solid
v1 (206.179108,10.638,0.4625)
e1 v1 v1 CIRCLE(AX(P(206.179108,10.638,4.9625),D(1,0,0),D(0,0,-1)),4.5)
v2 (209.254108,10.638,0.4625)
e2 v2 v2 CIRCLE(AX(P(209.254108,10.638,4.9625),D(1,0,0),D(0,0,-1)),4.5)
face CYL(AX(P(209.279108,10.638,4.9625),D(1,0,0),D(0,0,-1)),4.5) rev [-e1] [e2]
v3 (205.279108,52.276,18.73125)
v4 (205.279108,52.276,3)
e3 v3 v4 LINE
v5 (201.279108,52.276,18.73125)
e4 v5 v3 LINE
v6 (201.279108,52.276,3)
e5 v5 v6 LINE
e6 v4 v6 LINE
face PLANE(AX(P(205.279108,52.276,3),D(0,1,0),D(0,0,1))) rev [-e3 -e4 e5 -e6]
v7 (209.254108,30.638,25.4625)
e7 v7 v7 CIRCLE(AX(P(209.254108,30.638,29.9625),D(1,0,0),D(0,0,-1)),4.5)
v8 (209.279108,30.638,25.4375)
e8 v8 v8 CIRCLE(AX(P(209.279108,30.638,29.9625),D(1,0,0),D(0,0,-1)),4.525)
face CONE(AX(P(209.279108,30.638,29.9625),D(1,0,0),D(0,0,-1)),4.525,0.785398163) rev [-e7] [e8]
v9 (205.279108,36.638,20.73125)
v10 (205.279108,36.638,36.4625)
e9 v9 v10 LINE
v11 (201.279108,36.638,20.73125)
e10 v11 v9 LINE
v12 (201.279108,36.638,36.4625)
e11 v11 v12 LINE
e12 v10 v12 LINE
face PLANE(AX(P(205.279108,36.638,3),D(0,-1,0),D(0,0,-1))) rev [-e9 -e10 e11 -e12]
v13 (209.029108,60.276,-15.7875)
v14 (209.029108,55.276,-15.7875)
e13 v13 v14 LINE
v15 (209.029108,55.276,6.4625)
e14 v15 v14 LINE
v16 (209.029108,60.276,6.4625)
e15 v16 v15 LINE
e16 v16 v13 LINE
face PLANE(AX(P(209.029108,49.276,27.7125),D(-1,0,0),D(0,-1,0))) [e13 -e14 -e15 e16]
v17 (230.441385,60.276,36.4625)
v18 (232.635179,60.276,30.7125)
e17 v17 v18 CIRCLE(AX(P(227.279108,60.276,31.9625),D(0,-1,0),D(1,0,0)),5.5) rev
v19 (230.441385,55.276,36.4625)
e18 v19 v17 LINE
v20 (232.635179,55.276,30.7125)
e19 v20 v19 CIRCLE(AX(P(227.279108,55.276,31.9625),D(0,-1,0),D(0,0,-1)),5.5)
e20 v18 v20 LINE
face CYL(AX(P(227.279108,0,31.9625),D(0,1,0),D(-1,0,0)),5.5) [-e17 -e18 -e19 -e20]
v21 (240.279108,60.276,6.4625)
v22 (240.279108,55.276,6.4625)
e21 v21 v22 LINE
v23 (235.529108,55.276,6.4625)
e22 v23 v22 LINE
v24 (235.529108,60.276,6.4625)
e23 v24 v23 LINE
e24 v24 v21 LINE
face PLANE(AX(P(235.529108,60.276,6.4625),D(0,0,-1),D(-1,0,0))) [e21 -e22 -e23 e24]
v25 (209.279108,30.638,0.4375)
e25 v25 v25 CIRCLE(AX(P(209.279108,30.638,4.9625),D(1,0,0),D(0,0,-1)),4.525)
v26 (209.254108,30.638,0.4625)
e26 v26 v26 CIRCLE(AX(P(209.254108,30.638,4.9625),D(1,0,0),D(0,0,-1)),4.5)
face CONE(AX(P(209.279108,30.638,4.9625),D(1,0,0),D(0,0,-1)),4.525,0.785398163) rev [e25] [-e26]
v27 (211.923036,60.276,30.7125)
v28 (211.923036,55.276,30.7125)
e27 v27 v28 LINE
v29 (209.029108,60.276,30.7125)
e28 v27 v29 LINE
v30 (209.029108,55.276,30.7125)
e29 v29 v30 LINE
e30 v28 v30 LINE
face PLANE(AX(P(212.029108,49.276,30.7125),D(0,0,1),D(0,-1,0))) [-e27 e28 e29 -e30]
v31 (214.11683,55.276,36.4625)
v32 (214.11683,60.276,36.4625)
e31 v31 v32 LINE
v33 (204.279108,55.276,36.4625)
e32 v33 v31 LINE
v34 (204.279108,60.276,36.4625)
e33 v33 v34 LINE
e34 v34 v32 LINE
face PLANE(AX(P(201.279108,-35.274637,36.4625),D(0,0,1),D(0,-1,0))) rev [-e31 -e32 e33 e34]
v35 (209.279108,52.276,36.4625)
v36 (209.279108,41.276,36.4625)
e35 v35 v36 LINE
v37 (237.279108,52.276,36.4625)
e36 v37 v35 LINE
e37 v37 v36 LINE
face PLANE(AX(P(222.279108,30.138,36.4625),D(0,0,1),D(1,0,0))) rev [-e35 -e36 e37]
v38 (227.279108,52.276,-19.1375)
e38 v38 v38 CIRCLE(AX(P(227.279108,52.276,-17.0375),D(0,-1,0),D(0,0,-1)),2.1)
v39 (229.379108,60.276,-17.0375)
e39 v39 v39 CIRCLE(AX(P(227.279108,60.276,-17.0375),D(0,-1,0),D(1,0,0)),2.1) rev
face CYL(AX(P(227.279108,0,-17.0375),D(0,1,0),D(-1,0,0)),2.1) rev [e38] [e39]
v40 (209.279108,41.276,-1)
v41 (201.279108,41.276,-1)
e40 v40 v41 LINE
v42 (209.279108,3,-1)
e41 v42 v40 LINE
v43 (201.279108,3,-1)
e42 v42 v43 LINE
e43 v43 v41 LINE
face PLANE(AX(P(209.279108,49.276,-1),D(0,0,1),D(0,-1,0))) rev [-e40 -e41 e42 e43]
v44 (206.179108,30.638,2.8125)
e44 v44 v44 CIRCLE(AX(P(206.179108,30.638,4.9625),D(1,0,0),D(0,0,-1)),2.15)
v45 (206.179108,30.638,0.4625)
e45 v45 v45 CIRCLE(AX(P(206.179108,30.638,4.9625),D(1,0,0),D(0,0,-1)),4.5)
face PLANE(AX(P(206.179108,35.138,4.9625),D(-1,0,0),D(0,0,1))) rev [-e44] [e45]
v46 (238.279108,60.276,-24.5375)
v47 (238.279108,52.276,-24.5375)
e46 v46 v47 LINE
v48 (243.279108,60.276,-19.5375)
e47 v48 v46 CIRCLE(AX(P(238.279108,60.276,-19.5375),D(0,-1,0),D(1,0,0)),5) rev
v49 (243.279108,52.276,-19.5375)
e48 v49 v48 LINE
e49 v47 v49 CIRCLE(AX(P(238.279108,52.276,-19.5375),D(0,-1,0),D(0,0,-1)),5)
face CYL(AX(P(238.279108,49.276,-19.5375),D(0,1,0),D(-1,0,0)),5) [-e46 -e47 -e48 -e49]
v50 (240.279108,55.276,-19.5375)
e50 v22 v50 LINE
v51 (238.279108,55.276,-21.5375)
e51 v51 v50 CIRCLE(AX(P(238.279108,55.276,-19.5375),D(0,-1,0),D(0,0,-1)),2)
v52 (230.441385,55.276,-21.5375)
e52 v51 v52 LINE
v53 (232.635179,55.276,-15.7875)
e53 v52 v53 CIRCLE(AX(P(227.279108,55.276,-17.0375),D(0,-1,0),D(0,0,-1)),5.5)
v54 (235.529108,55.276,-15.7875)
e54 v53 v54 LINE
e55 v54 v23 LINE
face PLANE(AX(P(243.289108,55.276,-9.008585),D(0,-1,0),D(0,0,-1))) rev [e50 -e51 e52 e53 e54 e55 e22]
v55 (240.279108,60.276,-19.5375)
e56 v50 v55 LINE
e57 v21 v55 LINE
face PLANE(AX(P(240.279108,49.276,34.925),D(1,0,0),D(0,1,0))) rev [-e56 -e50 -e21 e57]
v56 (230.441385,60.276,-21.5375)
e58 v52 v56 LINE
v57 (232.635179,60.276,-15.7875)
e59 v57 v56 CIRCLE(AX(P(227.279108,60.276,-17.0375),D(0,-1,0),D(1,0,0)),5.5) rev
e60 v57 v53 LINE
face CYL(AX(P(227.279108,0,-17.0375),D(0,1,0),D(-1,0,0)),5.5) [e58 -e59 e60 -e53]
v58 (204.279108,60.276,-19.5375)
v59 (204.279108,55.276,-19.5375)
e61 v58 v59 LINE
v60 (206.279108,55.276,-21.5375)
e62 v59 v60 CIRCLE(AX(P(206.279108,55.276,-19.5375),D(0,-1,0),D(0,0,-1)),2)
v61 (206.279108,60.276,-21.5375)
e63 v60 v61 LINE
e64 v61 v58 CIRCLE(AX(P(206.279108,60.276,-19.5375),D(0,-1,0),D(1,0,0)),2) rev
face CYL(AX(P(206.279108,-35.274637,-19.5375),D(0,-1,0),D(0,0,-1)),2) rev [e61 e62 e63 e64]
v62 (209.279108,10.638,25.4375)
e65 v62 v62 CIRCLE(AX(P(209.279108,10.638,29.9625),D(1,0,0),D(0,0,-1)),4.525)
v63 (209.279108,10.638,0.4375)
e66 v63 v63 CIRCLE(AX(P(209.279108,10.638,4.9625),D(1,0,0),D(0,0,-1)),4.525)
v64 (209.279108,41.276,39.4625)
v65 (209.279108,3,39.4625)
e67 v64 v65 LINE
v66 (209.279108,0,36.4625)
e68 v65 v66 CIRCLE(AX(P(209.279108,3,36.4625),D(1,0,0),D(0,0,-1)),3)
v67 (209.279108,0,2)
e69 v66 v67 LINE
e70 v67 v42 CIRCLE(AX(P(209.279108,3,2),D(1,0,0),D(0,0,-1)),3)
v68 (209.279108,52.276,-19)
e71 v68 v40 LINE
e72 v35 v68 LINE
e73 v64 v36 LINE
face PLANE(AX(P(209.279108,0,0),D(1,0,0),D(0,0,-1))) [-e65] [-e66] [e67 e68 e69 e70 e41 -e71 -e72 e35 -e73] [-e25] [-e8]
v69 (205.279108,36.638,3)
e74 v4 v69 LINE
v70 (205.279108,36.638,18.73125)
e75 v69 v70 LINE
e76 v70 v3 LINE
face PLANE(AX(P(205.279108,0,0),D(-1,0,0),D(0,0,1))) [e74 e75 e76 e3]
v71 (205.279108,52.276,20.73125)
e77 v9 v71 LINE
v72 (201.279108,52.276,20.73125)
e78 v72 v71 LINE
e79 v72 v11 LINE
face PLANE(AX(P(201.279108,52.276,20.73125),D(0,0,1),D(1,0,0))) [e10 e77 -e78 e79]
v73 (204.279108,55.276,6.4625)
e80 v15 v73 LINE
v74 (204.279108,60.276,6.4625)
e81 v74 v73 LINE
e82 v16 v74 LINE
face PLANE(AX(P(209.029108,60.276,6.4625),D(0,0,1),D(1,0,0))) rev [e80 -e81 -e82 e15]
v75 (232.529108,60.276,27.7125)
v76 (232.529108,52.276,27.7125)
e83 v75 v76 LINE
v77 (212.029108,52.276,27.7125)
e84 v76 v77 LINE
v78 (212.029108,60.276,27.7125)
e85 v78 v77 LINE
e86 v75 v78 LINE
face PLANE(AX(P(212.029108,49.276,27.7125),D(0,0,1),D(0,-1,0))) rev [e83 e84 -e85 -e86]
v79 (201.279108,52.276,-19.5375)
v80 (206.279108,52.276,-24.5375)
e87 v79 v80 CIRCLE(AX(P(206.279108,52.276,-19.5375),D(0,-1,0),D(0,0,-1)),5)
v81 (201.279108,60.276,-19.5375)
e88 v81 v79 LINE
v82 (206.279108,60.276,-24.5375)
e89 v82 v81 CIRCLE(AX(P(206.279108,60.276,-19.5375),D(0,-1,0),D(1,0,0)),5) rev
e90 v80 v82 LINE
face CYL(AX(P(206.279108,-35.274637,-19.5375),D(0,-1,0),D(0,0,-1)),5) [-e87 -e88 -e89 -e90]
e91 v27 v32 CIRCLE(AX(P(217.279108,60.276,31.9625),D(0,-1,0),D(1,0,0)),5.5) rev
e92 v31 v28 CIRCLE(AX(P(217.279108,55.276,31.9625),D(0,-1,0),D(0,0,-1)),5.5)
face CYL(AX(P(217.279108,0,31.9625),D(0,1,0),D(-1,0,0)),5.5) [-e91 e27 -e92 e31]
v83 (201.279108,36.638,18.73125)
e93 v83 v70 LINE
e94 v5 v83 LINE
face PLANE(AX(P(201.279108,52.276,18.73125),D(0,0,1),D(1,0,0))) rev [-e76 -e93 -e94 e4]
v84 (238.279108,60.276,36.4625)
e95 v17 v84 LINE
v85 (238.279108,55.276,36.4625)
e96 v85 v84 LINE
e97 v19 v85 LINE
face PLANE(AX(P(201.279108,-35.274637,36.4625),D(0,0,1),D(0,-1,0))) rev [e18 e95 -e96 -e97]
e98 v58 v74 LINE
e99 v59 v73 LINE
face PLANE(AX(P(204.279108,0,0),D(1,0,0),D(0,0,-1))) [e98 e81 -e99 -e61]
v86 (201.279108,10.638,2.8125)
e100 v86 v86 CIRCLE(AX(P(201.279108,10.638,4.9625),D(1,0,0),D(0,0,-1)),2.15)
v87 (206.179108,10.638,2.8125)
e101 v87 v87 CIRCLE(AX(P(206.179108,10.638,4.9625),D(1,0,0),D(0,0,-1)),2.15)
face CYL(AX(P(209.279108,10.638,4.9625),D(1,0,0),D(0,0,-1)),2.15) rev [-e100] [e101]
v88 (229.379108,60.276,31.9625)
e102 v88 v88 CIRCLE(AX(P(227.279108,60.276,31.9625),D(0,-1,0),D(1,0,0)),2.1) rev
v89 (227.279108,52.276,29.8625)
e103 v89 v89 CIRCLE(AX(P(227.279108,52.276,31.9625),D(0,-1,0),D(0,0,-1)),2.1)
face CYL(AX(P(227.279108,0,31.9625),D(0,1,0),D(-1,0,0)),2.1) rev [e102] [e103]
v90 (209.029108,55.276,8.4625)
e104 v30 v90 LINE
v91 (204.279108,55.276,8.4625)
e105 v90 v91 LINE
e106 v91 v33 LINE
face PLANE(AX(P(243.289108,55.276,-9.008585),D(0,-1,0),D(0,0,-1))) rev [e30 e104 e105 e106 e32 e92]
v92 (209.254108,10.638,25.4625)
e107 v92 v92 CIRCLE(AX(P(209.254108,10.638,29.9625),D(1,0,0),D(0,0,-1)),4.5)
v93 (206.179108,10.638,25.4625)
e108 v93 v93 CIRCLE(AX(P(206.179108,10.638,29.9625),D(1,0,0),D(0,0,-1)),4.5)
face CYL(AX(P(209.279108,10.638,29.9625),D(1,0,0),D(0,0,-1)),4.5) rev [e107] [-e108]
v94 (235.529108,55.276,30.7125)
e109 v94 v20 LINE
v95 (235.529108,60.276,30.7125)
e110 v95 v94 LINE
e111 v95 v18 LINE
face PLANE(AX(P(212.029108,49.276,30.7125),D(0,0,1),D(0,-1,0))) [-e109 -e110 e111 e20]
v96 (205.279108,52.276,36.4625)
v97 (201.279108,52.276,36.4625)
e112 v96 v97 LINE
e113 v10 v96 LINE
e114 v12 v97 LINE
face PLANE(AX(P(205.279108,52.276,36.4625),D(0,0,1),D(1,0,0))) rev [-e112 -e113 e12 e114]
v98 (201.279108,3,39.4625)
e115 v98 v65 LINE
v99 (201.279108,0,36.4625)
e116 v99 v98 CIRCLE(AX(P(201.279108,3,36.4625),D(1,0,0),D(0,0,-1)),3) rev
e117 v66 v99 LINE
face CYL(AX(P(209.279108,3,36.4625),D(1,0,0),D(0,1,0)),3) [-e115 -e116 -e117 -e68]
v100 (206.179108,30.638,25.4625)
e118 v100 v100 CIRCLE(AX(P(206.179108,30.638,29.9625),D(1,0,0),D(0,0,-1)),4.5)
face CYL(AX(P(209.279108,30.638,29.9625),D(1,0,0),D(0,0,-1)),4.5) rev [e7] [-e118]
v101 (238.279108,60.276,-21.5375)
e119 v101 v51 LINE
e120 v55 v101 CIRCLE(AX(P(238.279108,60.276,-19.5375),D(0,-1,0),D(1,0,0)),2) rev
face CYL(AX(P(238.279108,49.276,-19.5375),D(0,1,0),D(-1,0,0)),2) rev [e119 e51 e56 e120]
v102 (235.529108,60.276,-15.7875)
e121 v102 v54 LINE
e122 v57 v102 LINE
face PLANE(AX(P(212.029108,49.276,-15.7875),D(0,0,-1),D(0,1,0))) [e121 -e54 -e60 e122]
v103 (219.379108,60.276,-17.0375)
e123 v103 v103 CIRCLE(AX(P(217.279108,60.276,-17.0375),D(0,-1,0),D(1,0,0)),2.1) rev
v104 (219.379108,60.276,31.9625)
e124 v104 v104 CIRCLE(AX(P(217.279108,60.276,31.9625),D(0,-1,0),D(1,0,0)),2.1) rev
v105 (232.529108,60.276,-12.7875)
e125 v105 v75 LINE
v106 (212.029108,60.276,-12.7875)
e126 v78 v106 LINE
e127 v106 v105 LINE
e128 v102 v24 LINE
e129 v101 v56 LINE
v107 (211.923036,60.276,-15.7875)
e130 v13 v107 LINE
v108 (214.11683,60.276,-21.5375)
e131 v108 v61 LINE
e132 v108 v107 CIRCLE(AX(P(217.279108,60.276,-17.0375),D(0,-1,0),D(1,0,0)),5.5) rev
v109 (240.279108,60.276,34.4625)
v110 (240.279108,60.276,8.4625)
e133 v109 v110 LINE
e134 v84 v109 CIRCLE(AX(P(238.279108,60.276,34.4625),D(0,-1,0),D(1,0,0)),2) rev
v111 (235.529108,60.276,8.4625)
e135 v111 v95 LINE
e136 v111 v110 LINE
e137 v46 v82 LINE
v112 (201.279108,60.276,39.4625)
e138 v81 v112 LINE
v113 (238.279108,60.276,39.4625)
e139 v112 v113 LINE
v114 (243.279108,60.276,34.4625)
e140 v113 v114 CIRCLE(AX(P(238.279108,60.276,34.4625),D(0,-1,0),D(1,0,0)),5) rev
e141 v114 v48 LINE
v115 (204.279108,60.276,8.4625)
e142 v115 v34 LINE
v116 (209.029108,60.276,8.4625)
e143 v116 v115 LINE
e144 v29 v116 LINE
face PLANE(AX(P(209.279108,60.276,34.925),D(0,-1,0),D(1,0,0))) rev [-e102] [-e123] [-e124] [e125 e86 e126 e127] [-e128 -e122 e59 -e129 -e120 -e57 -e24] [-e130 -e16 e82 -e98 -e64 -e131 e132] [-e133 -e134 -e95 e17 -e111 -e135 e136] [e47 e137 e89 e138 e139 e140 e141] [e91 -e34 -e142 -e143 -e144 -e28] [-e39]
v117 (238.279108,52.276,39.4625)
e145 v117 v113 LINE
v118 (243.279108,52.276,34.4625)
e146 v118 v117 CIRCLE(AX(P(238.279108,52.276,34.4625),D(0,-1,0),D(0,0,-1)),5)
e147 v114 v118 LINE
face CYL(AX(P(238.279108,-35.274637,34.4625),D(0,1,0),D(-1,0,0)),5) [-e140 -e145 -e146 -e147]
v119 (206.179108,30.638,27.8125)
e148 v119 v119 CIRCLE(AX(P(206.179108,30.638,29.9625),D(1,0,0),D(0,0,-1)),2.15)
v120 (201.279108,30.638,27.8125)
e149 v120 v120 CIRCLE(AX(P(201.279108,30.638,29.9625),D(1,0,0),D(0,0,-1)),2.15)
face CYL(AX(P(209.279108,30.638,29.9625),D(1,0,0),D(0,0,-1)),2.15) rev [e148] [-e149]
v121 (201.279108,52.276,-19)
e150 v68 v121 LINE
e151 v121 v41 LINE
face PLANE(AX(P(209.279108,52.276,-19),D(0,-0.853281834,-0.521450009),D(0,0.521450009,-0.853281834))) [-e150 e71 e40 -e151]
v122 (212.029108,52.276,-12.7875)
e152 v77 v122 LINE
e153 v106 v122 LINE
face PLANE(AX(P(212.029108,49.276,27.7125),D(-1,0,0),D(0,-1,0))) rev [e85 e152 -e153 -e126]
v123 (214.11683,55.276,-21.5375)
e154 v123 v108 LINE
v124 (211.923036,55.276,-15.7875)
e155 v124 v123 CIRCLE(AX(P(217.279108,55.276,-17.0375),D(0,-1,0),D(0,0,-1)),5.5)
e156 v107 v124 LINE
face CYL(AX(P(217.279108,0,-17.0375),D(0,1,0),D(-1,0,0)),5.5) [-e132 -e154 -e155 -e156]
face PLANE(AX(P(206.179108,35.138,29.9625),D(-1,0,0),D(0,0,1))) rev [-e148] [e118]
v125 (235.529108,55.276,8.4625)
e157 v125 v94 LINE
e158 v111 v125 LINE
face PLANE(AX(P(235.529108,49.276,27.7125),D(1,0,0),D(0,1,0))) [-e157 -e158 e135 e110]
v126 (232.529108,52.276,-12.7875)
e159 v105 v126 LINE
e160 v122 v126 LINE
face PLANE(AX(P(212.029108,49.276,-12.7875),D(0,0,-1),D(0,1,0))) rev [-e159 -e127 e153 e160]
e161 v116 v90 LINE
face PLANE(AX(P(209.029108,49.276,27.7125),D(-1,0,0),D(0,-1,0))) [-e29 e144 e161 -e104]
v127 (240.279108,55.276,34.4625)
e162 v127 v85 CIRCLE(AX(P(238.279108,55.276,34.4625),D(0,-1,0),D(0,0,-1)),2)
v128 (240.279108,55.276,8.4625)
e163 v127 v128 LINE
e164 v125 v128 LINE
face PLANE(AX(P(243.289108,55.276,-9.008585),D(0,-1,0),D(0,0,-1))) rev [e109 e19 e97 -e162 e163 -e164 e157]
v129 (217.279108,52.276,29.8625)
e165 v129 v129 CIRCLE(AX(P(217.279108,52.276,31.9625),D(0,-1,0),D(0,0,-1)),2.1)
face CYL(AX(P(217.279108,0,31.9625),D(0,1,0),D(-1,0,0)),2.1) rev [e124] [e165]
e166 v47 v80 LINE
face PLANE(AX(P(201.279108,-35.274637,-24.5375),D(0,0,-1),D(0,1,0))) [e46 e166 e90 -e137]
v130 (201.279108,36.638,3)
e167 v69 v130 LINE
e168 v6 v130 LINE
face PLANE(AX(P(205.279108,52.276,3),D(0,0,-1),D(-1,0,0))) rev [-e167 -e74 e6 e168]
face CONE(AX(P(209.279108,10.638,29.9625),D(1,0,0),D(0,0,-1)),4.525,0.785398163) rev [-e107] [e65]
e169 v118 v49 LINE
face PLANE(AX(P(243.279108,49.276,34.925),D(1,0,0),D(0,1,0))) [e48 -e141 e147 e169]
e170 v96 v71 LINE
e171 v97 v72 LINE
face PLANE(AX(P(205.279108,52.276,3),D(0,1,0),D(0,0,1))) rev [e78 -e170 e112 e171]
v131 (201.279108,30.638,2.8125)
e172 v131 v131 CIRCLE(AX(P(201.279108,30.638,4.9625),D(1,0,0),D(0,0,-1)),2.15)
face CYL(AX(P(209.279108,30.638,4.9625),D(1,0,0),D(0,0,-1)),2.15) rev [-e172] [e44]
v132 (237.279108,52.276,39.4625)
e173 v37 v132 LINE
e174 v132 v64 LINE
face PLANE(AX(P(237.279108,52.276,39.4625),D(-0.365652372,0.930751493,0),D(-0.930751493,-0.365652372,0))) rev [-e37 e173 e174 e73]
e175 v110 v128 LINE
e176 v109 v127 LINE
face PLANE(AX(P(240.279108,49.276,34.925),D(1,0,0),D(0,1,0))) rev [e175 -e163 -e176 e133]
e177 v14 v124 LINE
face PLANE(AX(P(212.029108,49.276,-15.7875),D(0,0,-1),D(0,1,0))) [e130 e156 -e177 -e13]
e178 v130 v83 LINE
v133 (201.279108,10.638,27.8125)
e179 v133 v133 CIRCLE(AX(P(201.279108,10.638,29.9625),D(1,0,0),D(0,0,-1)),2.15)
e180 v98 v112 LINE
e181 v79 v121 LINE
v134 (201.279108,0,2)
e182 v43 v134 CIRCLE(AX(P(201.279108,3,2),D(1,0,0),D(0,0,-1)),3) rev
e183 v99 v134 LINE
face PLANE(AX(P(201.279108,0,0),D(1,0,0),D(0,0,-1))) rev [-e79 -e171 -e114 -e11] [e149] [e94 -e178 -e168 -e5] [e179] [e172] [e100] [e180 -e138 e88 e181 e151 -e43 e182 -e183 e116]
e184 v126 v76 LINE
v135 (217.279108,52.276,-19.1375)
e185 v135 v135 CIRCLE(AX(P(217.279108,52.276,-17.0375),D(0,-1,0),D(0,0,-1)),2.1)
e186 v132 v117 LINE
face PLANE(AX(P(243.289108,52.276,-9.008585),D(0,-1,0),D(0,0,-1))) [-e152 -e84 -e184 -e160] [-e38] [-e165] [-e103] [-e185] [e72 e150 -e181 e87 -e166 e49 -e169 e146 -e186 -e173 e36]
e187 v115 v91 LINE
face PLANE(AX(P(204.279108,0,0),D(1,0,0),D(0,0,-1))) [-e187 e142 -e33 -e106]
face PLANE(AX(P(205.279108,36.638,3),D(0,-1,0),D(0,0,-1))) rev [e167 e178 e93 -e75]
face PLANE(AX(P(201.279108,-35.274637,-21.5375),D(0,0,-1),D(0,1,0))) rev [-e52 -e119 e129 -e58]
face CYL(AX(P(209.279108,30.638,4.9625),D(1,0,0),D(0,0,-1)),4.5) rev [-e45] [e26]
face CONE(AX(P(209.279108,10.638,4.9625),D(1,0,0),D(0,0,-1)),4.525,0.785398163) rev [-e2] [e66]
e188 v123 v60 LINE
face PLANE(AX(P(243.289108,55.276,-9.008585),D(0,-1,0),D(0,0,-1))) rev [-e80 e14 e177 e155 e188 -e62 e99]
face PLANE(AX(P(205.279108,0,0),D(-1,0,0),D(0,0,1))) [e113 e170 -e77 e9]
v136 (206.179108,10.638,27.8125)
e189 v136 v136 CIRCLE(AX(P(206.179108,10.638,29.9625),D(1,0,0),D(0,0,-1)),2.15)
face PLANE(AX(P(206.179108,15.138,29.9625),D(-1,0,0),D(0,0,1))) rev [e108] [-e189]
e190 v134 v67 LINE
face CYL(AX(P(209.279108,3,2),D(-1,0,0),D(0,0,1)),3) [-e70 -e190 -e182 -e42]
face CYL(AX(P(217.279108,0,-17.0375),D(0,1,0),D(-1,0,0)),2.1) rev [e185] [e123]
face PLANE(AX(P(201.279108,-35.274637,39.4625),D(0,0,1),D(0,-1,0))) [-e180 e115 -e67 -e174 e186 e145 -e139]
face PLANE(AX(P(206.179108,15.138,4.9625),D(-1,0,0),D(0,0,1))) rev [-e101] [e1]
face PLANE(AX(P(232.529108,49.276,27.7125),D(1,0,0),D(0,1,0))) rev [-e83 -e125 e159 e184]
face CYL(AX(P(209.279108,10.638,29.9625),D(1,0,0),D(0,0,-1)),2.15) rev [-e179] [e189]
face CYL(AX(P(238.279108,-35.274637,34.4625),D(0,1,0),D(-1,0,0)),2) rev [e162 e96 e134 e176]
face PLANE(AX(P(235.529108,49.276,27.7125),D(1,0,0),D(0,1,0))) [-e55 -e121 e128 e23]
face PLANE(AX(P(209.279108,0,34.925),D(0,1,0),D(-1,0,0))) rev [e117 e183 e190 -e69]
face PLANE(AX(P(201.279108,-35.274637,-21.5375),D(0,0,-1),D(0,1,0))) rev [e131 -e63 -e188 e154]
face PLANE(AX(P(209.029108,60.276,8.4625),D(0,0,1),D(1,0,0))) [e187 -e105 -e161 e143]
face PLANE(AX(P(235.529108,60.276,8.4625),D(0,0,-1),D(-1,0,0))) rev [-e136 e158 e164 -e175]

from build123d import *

# Parameters (mm, degrees)
SKETCH1_W                                     = 34.925
SKETCH1_H                                     = 49.276
BOSS_EXTRUDE1_DEPTH                           = 8
SKETCH2_W                                     = 42
SKETCH2_H                                     = 8
BOSS_EXTRUDE2_DEPTH                           = 34.925
CBORE_FOR_M4_PAN_HEAD_MACHINE_SCREW1_AT_COUNT = 2
CBORE_FOR_M4_PAN_HEAD_MACHINE_SCREW1_AT_PITCH = 25.000000038
CBORE_FOR_M4_PAN_HEAD_MACHINE_SCREW1_2_COUNT  = 2
CBORE_FOR_M4_PAN_HEAD_MACHINE_SCREW1_2_PITCH  = 32.015620982
CBORE_FOR_M4_PAN_HEAD_MACHINE_SCREW1_3_COUNT  = 2
CBORE_FOR_M4_PAN_HEAD_MACHINE_SCREW1_3_PITCH  = 19.999999624
SKETCH5_R                                     = 9
CUT_EXTRUDE1_DEPTH                            = 21
CUT_EXTRUDE2_START                            = -1
SKETCH5_4_R                                   = 11
CUT_EXTRUDE2_DEPTH                            = 7
FILLET1_R                                     = 17
SKETCH7_W                                     = 42
SKETCH7_H                                     = 64
BOSS_EXTRUDE3_DEPTH                           = 8
SKETCH8_R                                     = 2.5
CUT_EXTRUDE3_DEPTH                            = 252.336701124
MOVE_FACE1_OUTLINE_W                          = 8
MOVE_FACE1_OUTLINE_H                          = 4.5375
MOVE_FACE1_DEPTH                              = 41.276
SKETCH9_W                                     = 20.5
SKETCH9_H                                     = 40.5
CUT_EXTRUDE4_DEPTH                            = 250.891419084
MOVE_FACE2_BY                                 = 11
MOVE_START                                    = -24.5375
MOVE_FACE3_OUTLINE_W                          = 34
MOVE_FACE3_OUTLINE_H                          = 11
MOVE_FACE3_DEPTH                              = 64
MOVE_FACE3_2_OUTLINE_W                        = 8
MOVE_FACE3_2_OUTLINE_H                        = 11
MOVE_FACE3_2_DEPTH                            = 24.5375
FILLET2_R                                     = 5
SPLIT1_SURFACE_1_BACK                         = 98.433
SPLIT1_SURFACE_1_DEPTH                        = 196.866
SPLIT1_SURFACE_2_BACK                         = 98.433
SPLIT1_SURFACE_2_DEPTH                        = 196.866
SHELL2_START                                  = 55.276
SHELL2_DEPTH                                  = 5
SKETCH11_W                                    = 33.4625
SKETCH11_H                                    = 15.638000188
CUT_EXTRUDE5_DEPTH                            = 4
RIB1_REACH                                    = 85.394
SKETCH12_WALLS_W                              = 2
SKETCH12_WALLS_H                              = 184.425110988
MOVE_START_2                                  = 55.276
MOVE_FACE4_DEPTH                              = 5
RIB2_REACH                                    = 255.723
SKETCH13_WALLS_W                              = 514.195403297
SKETCH13_WALLS_H                              = 2
MOVE_FACE5_BY                                 = 1
FILLET3_R                                     = 3
RIB4_REACH                                    = 260.677
SKETCH14_WALL_W                               = 549.437720842
SKETCH14_WALL_H                               = 3
BOSS_EXTRUDE4_DEPTH                           = 8
MOVE_FACE6_BY                                 = 0.4
MOVE_FACE6_2_BY                               = 0.4
MOVE_FACE6_3_BY                               = 0.4
MOVE_FACE6_4_BY                               = 0.4


# Read off the part's stored shape, not the designer's step: Move Face1, Move Face3, Shell2, Move Face4
with BuildPart() as part:
    # Sketch1 → Boss-Extrude1 (new body)
    with BuildSketch(Plane(origin=(201.279107713, 0, 0), x_dir=(0, 0, -1), z_dir=(1, 0, 0))):
        with Locations((-17.4625, 24.638)):
            Rectangle(SKETCH1_W, SKETCH1_H)
    extrude(amount=BOSS_EXTRUDE1_DEPTH)

    # Sketch2 → Boss-Extrude2 (add)
    with BuildSketch(Plane(origin=(0, 0, 0), x_dir=(-1, 0, 0), z_dir=(0, 0, -1))):
        with Locations((-222.279107713, 45.276)):
            Rectangle(SKETCH2_W, SKETCH2_H)
    extrude(amount=-BOSS_EXTRUDE2_DEPTH)

    # Sketch3 → CBORE for M4 Pan Head Machine Screw1 (revolve, cut)
    with BuildSketch(Plane(origin=(209.279107713, 30.637999812, 4.962499981), x_dir=(0, 0, -1), z_dir=(0, 1, 0))):
        Polygon((0, 0), (0, 8), (2.15, 8), (2.15, 3.1), (4.5, 3.1), (4.5, 0.025), (4.525, 0), align=None)
    cbore_for_m4_pan_head_machine_screw1 = revolve(axis=Axis((215.629107713, 30.637999812, 4.962499981), (-1, 0, 0)), mode=Mode.SUBTRACT)

    # CBORE for M4 Pan Head Machine Screw1 at: CBORE for M4 Pan Head Machine Screw1 ×2
    with Locations(*[(0, 0, i * CBORE_FOR_M4_PAN_HEAD_MACHINE_SCREW1_AT_PITCH) for i in range(1, CBORE_FOR_M4_PAN_HEAD_MACHINE_SCREW1_AT_COUNT)]):
        add(cbore_for_m4_pan_head_machine_screw1, mode=Mode.SUBTRACT)

    # CBORE for M4 Pan Head Machine Screw1 2: CBORE for M4 Pan Head Machine Screw1 ×2
    with Locations(*[Vector(0, -0.624695039814301, 0.780868815635129) * (i * CBORE_FOR_M4_PAN_HEAD_MACHINE_SCREW1_2_PITCH) for i in range(1, CBORE_FOR_M4_PAN_HEAD_MACHINE_SCREW1_2_COUNT)]):
        add(cbore_for_m4_pan_head_machine_screw1, mode=Mode.SUBTRACT)

    # CBORE for M4 Pan Head Machine Screw1 3: CBORE for M4 Pan Head Machine Screw1 ×2
    with Locations(*[(0, -i * CBORE_FOR_M4_PAN_HEAD_MACHINE_SCREW1_3_PITCH, 0) for i in range(1, CBORE_FOR_M4_PAN_HEAD_MACHINE_SCREW1_3_COUNT)]):
        add(cbore_for_m4_pan_head_machine_screw1, mode=Mode.SUBTRACT)

    # Sketch5 → Cut-Extrude1 (cut)
    with BuildSketch(Plane(origin=(0, 49.276, 0), x_dir=(1, 0, 0), z_dir=(0, 1, 0))):
        with Locations(Location((222.279107713, -17.4625, 0), (0, 0, 180))):
            Circle(SKETCH5_R)
    extrude(amount=-CUT_EXTRUDE1_DEPTH, mode=Mode.SUBTRACT)

    # Sketch5<4> → Cut-Extrude2 (cut)
    with BuildSketch(Plane(origin=(0, 49.276, 0), x_dir=(1, 0, 0), z_dir=(0, 1, 0)).offset(CUT_EXTRUDE2_START)):
        with Locations(Location((222.279107713, -17.4625, 0), (0, 0, 180))):
            Circle(SKETCH5_4_R)
    extrude(amount=-CUT_EXTRUDE2_DEPTH, mode=Mode.SUBTRACT)

    # Fillet1
    fillet1_edges = [part.edges().sort_by_distance(p)[0] for p in [
        (243.279107713, 45.276, 34.925),
        (243.279107713, 45.276, 0),
    ]]
    fillet(fillet1_edges, radius=FILLET1_R)

    # Sketch7 → Boss-Extrude3 (add)
    with BuildSketch(Plane(origin=(0, 49.276, 0), x_dir=(1, 0, 0), z_dir=(0, 1, 0))):
        with Locations((222.279107713, -7.4625)):
            Rectangle(SKETCH7_W, SKETCH7_H)
    extrude(amount=-BOSS_EXTRUDE3_DEPTH)

    # Sketch8 → Cut-Extrude3 (cut, through all)
    with BuildSketch(Plane(origin=(0, 49.276, 0), x_dir=(1, 0, 0), z_dir=(0, 1, 0))):
        with Locations(Location((217.279107713, -31.9625, 0), (0, 0, 180))):
            Circle(SKETCH8_R)
        with Locations(Location((227.279107713, -31.9625, 0), (0, 0, 180))):
            Circle(SKETCH8_R)
        with Locations(Location((227.279107713, 17.0375, 0), (0, 0, 180))):
            Circle(SKETCH8_R)
        with Locations(Location((217.279107713, 17.0375, 0), (0, 0, 180))):
            Circle(SKETCH8_R)
    extrude(amount=-CUT_EXTRUDE3_DEPTH, mode=Mode.SUBTRACT)

    # Move Face1 outline → Move Face1 (add)
    with BuildSketch(Plane(origin=(0, 0, 0), x_dir=(1, 0, 0), z_dir=(0, 1, 0))):
        with Locations((205.279107713, -37.19375)):
            Rectangle(MOVE_FACE1_OUTLINE_W, MOVE_FACE1_OUTLINE_H)
    extrude(amount=MOVE_FACE1_DEPTH)

    # Sketch9 → Cut-Extrude4 (cut, through all)
    with BuildSketch(Plane.XZ.offset(-41.276)):
        with Locations((222.279107713, 7.4625)):
            Rectangle(SKETCH9_W, SKETCH9_H)
    extrude(amount=-CUT_EXTRUDE4_DEPTH, mode=Mode.SUBTRACT)

    # Move Face2: a face moved outward by 11.0
    extrude(part.faces().sort_by_distance((232.779107713, 49.276, 7.4625))[0], amount=MOVE_FACE2_BY, dir=(0, 1, 0))

    # Move Face3 outline → Move Face3 (cut)
    with BuildSketch(Plane.XY.offset(MOVE_START)):
        with Locations((226.279107713, 46.776)):
            Rectangle(MOVE_FACE3_OUTLINE_W, MOVE_FACE3_OUTLINE_H)
    extrude(amount=MOVE_FACE3_DEPTH, mode=Mode.SUBTRACT)

    # Move Face3 2 outline → Move Face3 2 (cut)
    with BuildSketch(Plane.XY.offset(MOVE_START)):
        with Locations((205.279107713, 46.776)):
            Rectangle(MOVE_FACE3_2_OUTLINE_W, MOVE_FACE3_2_OUTLINE_H)
    extrude(amount=MOVE_FACE3_2_DEPTH, mode=Mode.SUBTRACT)

    # Fillet2
    fillet2_edges = [part.edges().sort_by_distance(p)[0] for p in [
        (243.279107713, 56.276, 39.4625),
        (243.279107713, 56.276, -24.5375),
        (201.279107713, 56.276, -24.5375),
    ]]
    fillet(fillet2_edges, radius=FILLET2_R)


with BuildPart() as body_2:
    # Split1: the piece behind the surface
    add(part.part)
    # Split1 surface: a surface, the sketch's curves swept straight by 196.866 mm
    with BuildLine(Plane.ZY.offset(-201.279107713).offset(-SPLIT1_SURFACE_1_BACK), mode=Mode.PRIVATE) as split1_surface_1_path:
        Line((-9.008584857, 52.276), (46.481380633, 52.276))
    split1_surface_1 = Shell.extrude(split1_surface_1_path.wire(), (-1 * SPLIT1_SURFACE_1_DEPTH, 0 * SPLIT1_SURFACE_1_DEPTH, 0 * SPLIT1_SURFACE_1_DEPTH))
    split(bisect_by=split1_surface_1, keep=Keep.BOTTOM)


with BuildPart() as part_1:
    add(part.part)

    # Split1: split by a surface, the side it looks to stays
    # Split1 surface: a surface, the sketch's curves swept straight by 196.866 mm
    with BuildLine(Plane.ZY.offset(-201.279107713).offset(-SPLIT1_SURFACE_2_BACK), mode=Mode.PRIVATE) as split1_surface_2_path:
        Line((-9.008584857, 52.276), (46.481380633, 52.276))
    split1_surface_2 = Shell.extrude(split1_surface_2_path.wire(), (-1 * SPLIT1_SURFACE_2_DEPTH, 0 * SPLIT1_SURFACE_2_DEPTH, 0 * SPLIT1_SURFACE_2_DEPTH))
    split(bisect_by=split1_surface_2, keep=Keep.TOP)

    # Shell2 outline → Shell2 (cut)
    with BuildSketch(Plane(origin=(0, 0, 0), x_dir=(1, 0, 0), z_dir=(0, 1, 0)).offset(SHELL2_START)):
        with BuildLine():
            ThreePointArc((222.279107713, -34.253787847), (221.507026408, -35.480269678), (220.441385373, -36.4625))
            Line((220.441385373, -36.4625), (224.116830052, -36.4625))
            ThreePointArc((224.116830052, -36.4625), (223.051189017, -35.480269678), (222.279107713, -34.253787847))
        make_face()
        with BuildLine():
            ThreePointArc((232.635179034, -30.7125), (232.4178033, -33.923063097), (230.441385373, -36.4625))
            Line((230.441385373, -36.4625), (238.279107713, -36.4625))
            ThreePointArc((238.279107713, -36.4625), (239.693321275, -35.876713562), (240.279107713, -34.4625))
            Line((240.279107713, -34.4625), (240.279107713, 19.5375))
            ThreePointArc((240.279107713, 19.5375), (239.693321275, 20.951713562), (238.279107713, 21.5375))
            Line((238.279107713, 21.5375), (230.441385373, 21.5375))
            ThreePointArc((230.441385373, 21.5375), (232.4178033, 18.998063097), (232.635179034, 15.7875))
            Line((232.635179034, 15.7875), (235.529107713, 15.7875))
            Line((235.529107713, 15.7875), (235.529107713, -30.7125))
            Line((235.529107713, -30.7125), (232.635179034, -30.7125))
        make_face()
        with BuildLine():
            Line((204.279107713, 19.5375), (204.279107713, -36.4625))
            Line((204.279107713, -36.4625), (214.116830052, -36.4625))
            ThreePointArc((214.116830052, -36.4625), (212.140412125, -33.923063097), (211.923036391, -30.7125))
            Line((211.923036391, -30.7125), (209.029107713, -30.7125))
            Line((209.029107713, -30.7125), (209.029107713, 15.7875))
            Line((209.029107713, 15.7875), (211.923036391, 15.7875))
            ThreePointArc((211.923036391, 15.7875), (212.140412125, 18.998063097), (214.116830052, 21.5375))
            Line((214.116830052, 21.5375), (206.279107713, 21.5375))
            ThreePointArc((206.279107713, 21.5375), (204.86489415, 20.951713563), (204.279107713, 19.5375))
        make_face()
        with BuildLine():
            ThreePointArc((222.279107713, 19.328787847), (223.051189017, 20.555269678), (224.116830052, 21.5375))
            Line((224.116830052, 21.5375), (220.441385373, 21.5375))
            ThreePointArc((220.441385373, 21.5375), (221.507026408, 20.555269678), (222.279107713, 19.328787847))
        make_face()
    extrude(amount=SHELL2_DEPTH, mode=Mode.SUBTRACT)

    # Combine1: union body 2
    add(body_2.part)

    # Sketch11 → Cut-Extrude5 (cut)
    with BuildSketch(Plane.ZY.offset(-201.279107713)):
        with Locations((19.73125, 44.456999906)):
            Rectangle(SKETCH11_W, SKETCH11_H)
    extrude(amount=-CUT_EXTRUDE5_DEPTH, mode=Mode.SUBTRACT)

    # Sketch12 walls → Rib1 (add, up to next)
    with BuildSketch(Plane.ZY.offset(-201.279107713), mode=Mode.PRIVATE) as rib1_sk1:
        with Locations((19.73125, 44.456999906)):
            Rectangle(SKETCH12_WALLS_W, SKETCH12_WALLS_H)
    rib1_tool1 = extrude(rib1_sk1.sketch, amount=-RIB1_REACH, mode=Mode.PRIVATE) - part_1.part
    add(rib1_tool1.solids().sort_by_distance((201.279107713, 44.456999906, 19.73125))[0])

    # Move Face4 outline → Move Face4 (add)
    with BuildSketch(Plane(origin=(0, 0, 0), x_dir=(1, 0, 0), z_dir=(0, 1, 0)).offset(MOVE_START_2)):
        with BuildLine():
            ThreePointArc((222.279107713, -34.253787847), (221.507026408, -35.480269678), (220.441385373, -36.4625))
            Line((220.441385373, -36.4625), (224.116830052, -36.4625))
            ThreePointArc((224.116830052, -36.4625), (223.051189017, -35.480269678), (222.279107713, -34.253787847))
        make_face()
        with BuildLine():
            ThreePointArc((222.279107713, 19.328787847), (223.051189017, 20.555269678), (224.116830052, 21.5375))
            Line((224.116830052, 21.5375), (220.441385373, 21.5375))
            ThreePointArc((220.441385373, 21.5375), (221.507026408, 20.555269678), (222.279107713, 19.328787847))
        make_face()
    extrude(amount=MOVE_FACE4_DEPTH)

    # Sketch13 walls → Rib2 (add, up to next)
    with BuildSketch(Plane(origin=(0, 60.276, 0), x_dir=(1, 0, 0), z_dir=(0, 1, 0)), mode=Mode.PRIVATE) as rib2_sk1:
        with Locations((237.904107713, -7.4625)):
            Rectangle(SKETCH13_WALLS_W, SKETCH13_WALLS_H)
    rib2_tool1 = extrude(rib2_sk1.sketch, amount=-RIB2_REACH, mode=Mode.PRIVATE) - part_1.part
    # Sketch13 walls → Rib2 (add, up to next)
    with BuildSketch(Plane(origin=(0, 60.276, 0), x_dir=(1, 0, 0), z_dir=(0, 1, 0)), mode=Mode.PRIVATE) as rib2_sk2:
        with Locations((206.654107713, -7.4625)):
            Rectangle(SKETCH13_WALLS_W, SKETCH13_WALLS_H)
    rib2_tool2 = extrude(rib2_sk2.sketch, amount=-RIB2_REACH, mode=Mode.PRIVATE) - part_1.part
    add(rib2_tool1.solids().sort_by_distance((237.904107713, 60.276, 7.4625))[0])
    add(rib2_tool2.solids().sort_by_distance((206.654107713, 60.276, 7.4625))[0])

    # Move Face5: a face moved outward by 1.0
    extrude(part_1.faces().sort_by_distance((205.279107713, 26.138, 0))[0], amount=MOVE_FACE5_BY, dir=(0, 0, -1))

    # Fillet3
    fillet3_edges = [part_1.edges().sort_by_distance(p)[0] for p in [
        (205.279107713, 0, 39.4625),
        (205.279107713, 0, -1),
    ]]
    fillet(fillet3_edges, radius=FILLET3_R)

    # Sketch14 wall → Rib4 (add, up to next)
    with BuildSketch(Plane(origin=(223.279107713, 46.776, 39.4625), x_dir=(-0.93075149344, -0.365652372423, 0), z_dir=(0.365652372423, -0.93075149344, 0)), mode=Mode.PRIVATE) as rib4_sk1:
        with Locations((0, 1.5)):
            Rectangle(SKETCH14_WALL_W, SKETCH14_WALL_H)
    rib4_tool1 = extrude(rib4_sk1.sketch, amount=-RIB4_REACH, mode=Mode.PRIVATE) - part_1.part
    add(rib4_tool1.solids().sort_by_distance((223.279107713, 46.776, 39.4625))[0])

    # Sketch15 → Boss-Extrude4 (add)
    with BuildSketch(Plane.ZY.offset(-201.279107713)):
        Polygon((-19, 52.276), (-1, 41.276), (-1, 52.276), align=None)
    extrude(amount=-BOSS_EXTRUDE4_DEPTH)

    # Move Face6: a curved face moved outward by 0.4
    add(Solid.thicken(part_1.faces().sort_by_distance((229.779107713, 56.276, 31.9625))[0], MOVE_FACE6_BY))

    # Move Face6 2: a curved face moved outward by 0.4
    add(Solid.thicken(part_1.faces().sort_by_distance((219.779107713, 56.276, 31.9625))[0], MOVE_FACE6_2_BY))

    # Move Face6 3: a curved face moved outward by 0.4
    add(Solid.thicken(part_1.faces().sort_by_distance((229.779107713, 56.276, -17.0375))[0], MOVE_FACE6_3_BY))

    # Move Face6 4: a curved face moved outward by 0.4
    add(Solid.thicken(part_1.faces().sort_by_distance((219.779107713, 56.276, -17.0375))[0], MOVE_FACE6_4_BY))


solid = part_1.part
